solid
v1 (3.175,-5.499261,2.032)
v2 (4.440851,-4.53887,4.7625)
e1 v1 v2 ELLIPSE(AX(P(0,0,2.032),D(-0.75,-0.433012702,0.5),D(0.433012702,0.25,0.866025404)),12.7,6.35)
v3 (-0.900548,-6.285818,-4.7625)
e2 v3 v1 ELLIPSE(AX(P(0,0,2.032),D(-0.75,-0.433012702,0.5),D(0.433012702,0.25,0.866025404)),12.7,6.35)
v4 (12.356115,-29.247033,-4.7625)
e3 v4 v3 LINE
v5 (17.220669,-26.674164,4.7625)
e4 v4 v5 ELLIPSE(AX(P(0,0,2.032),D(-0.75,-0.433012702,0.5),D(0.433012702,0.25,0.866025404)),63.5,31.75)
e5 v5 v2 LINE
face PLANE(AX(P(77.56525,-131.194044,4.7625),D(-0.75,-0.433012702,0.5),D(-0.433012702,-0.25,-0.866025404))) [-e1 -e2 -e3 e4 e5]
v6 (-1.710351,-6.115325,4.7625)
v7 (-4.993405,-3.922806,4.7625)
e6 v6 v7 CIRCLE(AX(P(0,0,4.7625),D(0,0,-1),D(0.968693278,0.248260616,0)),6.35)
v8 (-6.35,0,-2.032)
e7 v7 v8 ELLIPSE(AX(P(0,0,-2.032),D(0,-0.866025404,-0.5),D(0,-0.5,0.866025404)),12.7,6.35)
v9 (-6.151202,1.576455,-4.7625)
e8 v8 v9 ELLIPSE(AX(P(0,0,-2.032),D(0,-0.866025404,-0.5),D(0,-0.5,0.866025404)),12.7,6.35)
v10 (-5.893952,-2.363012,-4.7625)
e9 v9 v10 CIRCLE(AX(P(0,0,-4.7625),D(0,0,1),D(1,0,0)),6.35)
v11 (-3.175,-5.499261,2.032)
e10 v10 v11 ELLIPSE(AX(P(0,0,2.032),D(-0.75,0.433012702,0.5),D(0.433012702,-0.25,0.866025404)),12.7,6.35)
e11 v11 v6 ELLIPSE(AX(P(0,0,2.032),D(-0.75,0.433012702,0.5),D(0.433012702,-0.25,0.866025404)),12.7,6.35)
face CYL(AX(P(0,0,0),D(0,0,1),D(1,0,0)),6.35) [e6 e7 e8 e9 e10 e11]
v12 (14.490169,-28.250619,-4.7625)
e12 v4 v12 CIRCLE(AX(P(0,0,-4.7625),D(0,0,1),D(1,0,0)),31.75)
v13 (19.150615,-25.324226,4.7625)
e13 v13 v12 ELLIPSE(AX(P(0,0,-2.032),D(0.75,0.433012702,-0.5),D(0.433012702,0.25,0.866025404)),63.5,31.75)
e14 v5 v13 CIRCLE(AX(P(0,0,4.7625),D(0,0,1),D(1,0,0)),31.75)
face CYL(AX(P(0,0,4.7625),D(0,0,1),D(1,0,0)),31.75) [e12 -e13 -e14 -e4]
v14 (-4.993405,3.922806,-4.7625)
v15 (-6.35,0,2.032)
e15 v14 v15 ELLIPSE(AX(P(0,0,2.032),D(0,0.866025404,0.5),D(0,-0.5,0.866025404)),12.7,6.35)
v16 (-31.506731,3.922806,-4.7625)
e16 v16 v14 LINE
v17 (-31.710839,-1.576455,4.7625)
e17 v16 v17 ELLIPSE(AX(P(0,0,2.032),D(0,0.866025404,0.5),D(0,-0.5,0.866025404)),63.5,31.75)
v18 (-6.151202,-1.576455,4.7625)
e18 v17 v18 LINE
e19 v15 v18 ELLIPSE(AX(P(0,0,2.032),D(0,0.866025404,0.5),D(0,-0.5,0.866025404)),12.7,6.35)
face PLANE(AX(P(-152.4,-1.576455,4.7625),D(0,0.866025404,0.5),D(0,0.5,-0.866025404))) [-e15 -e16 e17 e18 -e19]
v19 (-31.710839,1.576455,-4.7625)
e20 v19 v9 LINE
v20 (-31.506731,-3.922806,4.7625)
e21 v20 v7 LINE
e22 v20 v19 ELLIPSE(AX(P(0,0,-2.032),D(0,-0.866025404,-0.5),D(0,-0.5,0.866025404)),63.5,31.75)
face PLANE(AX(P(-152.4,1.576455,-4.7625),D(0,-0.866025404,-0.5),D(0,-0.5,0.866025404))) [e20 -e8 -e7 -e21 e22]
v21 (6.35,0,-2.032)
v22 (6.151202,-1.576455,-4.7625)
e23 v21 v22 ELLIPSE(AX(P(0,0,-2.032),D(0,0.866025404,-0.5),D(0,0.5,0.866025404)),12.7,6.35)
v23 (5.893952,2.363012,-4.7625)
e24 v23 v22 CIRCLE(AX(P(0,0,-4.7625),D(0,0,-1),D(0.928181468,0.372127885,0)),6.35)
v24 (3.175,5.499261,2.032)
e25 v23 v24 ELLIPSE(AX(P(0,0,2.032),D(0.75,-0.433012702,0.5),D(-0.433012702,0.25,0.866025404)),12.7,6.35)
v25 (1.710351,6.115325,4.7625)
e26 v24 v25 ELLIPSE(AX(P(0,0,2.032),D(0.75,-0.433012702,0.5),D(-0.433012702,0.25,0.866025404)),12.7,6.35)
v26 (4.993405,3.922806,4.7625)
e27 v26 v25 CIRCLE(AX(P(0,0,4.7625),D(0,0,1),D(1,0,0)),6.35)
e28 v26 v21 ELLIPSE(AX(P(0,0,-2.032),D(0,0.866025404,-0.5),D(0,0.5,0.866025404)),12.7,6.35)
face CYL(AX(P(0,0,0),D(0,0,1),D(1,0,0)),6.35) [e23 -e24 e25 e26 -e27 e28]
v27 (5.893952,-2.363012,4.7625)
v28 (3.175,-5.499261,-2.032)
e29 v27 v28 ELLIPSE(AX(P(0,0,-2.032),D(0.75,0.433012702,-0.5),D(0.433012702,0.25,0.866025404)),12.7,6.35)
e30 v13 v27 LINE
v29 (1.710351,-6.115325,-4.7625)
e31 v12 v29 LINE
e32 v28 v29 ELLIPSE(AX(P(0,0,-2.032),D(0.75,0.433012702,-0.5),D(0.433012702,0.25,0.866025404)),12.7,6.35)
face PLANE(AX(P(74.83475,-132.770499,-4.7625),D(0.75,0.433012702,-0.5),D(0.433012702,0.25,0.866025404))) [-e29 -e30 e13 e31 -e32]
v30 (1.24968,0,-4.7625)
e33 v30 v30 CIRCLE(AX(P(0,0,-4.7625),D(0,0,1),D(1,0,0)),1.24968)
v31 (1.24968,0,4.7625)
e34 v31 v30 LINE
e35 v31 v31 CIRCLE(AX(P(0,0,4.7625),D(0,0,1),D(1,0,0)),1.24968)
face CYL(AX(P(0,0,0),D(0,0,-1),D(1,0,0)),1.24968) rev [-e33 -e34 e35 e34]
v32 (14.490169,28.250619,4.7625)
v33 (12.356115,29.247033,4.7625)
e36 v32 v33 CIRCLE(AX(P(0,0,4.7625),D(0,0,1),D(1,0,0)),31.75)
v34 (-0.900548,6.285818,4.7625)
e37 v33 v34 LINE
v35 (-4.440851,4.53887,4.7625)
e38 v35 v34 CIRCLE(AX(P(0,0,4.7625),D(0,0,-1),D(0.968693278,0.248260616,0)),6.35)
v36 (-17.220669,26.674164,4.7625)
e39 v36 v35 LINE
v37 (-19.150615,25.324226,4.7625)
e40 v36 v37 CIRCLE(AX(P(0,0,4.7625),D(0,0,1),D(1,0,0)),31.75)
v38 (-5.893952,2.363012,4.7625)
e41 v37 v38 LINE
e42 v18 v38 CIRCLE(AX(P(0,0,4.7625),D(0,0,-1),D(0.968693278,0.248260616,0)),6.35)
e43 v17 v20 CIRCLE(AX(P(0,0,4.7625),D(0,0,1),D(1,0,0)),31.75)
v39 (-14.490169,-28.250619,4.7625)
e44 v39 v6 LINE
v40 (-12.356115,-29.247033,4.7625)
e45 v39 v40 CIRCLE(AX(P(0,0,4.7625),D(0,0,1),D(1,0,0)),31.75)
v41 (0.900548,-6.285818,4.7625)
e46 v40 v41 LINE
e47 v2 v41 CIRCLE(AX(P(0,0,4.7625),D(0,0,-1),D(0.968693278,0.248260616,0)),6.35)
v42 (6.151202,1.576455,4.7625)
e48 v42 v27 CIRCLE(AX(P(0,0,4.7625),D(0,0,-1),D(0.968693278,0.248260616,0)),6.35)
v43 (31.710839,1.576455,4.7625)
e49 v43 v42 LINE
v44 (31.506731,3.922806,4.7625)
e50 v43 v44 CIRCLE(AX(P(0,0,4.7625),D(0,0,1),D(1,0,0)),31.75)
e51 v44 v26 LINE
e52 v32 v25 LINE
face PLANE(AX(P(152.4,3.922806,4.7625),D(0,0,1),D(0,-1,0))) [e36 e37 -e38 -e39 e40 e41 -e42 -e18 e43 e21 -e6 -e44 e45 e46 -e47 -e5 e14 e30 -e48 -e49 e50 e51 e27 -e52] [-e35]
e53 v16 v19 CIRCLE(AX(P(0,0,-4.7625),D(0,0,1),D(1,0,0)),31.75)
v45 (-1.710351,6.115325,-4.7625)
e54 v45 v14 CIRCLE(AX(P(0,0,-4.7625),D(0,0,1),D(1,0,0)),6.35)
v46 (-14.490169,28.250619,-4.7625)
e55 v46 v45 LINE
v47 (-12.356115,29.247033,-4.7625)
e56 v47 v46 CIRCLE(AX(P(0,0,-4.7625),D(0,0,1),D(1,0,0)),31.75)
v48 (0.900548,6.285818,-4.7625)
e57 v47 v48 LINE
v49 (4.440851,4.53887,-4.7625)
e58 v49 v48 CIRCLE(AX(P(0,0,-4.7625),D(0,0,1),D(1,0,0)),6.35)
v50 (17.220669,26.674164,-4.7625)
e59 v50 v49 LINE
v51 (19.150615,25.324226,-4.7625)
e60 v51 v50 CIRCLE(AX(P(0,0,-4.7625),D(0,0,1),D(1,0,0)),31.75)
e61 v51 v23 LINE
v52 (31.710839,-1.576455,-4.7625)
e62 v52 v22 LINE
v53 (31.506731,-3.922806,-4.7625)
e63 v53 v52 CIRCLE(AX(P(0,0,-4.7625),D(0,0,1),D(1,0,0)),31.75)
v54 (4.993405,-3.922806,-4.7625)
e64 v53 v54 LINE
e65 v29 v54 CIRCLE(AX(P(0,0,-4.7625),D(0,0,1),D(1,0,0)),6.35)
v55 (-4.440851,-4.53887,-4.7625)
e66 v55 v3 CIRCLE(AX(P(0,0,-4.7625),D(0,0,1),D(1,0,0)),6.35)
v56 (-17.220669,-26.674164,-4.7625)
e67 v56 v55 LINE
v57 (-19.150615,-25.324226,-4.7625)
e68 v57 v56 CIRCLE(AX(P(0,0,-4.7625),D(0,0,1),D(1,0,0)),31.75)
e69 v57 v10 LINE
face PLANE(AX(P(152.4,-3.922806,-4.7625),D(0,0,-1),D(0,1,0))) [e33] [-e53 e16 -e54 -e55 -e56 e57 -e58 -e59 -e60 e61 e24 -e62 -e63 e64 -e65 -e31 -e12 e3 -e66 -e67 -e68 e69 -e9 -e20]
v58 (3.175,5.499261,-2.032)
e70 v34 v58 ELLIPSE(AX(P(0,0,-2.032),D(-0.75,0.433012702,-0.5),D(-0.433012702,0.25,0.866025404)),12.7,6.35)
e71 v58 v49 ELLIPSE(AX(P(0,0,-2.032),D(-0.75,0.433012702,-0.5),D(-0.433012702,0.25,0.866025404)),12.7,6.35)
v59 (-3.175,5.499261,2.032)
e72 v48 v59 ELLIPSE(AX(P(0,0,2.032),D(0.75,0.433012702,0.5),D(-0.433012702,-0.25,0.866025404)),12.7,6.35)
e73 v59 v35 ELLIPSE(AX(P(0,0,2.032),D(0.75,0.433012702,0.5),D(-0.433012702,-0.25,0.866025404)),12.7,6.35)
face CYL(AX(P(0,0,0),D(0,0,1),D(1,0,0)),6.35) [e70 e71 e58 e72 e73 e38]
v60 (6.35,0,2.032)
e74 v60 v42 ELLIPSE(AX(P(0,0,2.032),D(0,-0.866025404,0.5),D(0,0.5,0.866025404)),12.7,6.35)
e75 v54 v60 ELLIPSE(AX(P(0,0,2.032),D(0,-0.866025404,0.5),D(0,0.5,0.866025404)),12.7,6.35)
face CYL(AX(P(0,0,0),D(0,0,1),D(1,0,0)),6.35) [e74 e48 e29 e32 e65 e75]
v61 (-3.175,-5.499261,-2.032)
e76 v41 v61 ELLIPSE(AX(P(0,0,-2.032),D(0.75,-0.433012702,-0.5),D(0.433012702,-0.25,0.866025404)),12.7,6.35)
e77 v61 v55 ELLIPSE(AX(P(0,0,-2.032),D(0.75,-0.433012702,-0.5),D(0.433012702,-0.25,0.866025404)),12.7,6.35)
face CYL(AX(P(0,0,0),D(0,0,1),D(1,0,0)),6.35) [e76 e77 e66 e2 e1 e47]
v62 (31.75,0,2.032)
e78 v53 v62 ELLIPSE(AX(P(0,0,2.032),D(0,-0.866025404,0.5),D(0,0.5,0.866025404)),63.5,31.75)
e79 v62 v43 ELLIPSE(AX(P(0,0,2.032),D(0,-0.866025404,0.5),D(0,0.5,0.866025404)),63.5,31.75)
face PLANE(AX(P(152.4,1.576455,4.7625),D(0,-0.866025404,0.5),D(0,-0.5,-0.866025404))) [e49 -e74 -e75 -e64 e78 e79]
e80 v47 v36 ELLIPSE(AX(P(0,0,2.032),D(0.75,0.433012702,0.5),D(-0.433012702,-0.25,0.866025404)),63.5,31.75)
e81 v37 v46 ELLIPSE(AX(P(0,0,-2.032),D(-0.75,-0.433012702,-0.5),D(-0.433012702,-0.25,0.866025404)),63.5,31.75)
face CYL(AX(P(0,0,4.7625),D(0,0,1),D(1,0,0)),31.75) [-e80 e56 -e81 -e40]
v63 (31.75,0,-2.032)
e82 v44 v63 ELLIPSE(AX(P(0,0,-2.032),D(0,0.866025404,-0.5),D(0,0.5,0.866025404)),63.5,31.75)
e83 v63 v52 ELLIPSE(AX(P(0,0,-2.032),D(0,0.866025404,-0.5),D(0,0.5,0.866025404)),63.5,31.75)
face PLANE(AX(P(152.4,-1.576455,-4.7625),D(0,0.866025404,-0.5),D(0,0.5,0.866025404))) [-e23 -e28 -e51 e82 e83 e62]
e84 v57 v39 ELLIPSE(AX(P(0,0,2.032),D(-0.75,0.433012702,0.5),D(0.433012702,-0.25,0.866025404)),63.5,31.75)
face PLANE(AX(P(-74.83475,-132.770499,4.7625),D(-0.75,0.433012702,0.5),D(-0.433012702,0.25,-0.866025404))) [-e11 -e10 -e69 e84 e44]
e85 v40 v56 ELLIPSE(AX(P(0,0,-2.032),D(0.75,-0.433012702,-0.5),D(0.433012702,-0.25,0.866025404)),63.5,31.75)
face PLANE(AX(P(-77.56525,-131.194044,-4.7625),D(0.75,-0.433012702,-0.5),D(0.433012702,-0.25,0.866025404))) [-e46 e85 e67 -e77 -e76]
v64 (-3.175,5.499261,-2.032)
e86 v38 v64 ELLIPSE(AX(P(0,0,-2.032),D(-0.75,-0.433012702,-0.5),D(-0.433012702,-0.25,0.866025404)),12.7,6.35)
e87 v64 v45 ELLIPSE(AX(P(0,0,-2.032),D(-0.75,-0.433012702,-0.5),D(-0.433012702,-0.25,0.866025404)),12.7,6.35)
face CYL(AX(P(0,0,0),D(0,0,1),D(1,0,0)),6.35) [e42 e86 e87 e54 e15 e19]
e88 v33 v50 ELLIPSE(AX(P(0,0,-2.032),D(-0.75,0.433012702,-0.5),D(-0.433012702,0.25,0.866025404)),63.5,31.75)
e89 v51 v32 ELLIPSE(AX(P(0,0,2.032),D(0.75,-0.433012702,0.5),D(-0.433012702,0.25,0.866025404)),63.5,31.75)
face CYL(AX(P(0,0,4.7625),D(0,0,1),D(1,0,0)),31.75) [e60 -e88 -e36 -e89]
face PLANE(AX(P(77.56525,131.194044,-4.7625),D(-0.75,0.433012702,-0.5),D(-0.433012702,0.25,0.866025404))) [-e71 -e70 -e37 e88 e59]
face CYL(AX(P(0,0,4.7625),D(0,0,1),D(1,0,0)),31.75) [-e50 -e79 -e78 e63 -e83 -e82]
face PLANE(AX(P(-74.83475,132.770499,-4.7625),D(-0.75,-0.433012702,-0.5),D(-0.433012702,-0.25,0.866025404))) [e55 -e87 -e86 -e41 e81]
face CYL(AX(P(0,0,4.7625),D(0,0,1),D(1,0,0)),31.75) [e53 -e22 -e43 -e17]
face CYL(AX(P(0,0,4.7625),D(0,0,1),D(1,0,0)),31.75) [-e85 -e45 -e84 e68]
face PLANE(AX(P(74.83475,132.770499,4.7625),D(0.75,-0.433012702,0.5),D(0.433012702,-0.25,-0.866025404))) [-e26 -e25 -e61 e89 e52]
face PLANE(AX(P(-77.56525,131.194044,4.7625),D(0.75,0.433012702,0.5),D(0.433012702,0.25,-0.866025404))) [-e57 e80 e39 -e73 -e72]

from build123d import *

# Parameters (mm, degrees)
F0_R            = 6.35
F0_R_2          = 1.24968
F1_DEPTH        = 4.7625
F4_COPIES_COUNT = 6
F5_R            = 254
F5_R_2          = 31.75
F6_DEPTH        = 9.526


# Not quite as in the source:
# - a pattern or mirror of a feature is missing from the dataset's text; its kind, count and spacing are read off the source's solid


with BuildPart() as f1:
    # F0 (on Top) → F1 (new body, symmetric)
    with BuildSketch(Plane.XY):
        Circle(F0_R)
        Circle(F0_R_2, mode=Mode.SUBTRACT)
    extrude(amount=F1_DEPTH, both=True)

    # F3 (on offset) → F4 (join, up to the next surface of F1)
    with BuildSketch(Plane.YZ.offset(152.4)):
        Polygon((1.57645491, 4.7625), (-3.922806404, -4.7625), (-1.57645491, -4.7625), (3.922806404, 4.7625), align=None)
    f4 = extrude(until=Until.NEXT, dir=(-1, 0, 0))

    # F4_copies: F4 ×6 about axis
    f4_copies_axis = Axis((0, 0, 0), (0, 0, 1))
    for i in range(1, F4_COPIES_COUNT):
        add(f4.rotate(f4_copies_axis, i * 360 / F4_COPIES_COUNT))

    # F5 (on face) → F6 (cut, through all)
    with BuildSketch(Plane.XY.offset(4.7625)):
        Circle(F5_R)
        Circle(F5_R_2, mode=Mode.SUBTRACT)
    extrude(amount=-F6_DEPTH, mode=Mode.SUBTRACT)


solid = f1.part
